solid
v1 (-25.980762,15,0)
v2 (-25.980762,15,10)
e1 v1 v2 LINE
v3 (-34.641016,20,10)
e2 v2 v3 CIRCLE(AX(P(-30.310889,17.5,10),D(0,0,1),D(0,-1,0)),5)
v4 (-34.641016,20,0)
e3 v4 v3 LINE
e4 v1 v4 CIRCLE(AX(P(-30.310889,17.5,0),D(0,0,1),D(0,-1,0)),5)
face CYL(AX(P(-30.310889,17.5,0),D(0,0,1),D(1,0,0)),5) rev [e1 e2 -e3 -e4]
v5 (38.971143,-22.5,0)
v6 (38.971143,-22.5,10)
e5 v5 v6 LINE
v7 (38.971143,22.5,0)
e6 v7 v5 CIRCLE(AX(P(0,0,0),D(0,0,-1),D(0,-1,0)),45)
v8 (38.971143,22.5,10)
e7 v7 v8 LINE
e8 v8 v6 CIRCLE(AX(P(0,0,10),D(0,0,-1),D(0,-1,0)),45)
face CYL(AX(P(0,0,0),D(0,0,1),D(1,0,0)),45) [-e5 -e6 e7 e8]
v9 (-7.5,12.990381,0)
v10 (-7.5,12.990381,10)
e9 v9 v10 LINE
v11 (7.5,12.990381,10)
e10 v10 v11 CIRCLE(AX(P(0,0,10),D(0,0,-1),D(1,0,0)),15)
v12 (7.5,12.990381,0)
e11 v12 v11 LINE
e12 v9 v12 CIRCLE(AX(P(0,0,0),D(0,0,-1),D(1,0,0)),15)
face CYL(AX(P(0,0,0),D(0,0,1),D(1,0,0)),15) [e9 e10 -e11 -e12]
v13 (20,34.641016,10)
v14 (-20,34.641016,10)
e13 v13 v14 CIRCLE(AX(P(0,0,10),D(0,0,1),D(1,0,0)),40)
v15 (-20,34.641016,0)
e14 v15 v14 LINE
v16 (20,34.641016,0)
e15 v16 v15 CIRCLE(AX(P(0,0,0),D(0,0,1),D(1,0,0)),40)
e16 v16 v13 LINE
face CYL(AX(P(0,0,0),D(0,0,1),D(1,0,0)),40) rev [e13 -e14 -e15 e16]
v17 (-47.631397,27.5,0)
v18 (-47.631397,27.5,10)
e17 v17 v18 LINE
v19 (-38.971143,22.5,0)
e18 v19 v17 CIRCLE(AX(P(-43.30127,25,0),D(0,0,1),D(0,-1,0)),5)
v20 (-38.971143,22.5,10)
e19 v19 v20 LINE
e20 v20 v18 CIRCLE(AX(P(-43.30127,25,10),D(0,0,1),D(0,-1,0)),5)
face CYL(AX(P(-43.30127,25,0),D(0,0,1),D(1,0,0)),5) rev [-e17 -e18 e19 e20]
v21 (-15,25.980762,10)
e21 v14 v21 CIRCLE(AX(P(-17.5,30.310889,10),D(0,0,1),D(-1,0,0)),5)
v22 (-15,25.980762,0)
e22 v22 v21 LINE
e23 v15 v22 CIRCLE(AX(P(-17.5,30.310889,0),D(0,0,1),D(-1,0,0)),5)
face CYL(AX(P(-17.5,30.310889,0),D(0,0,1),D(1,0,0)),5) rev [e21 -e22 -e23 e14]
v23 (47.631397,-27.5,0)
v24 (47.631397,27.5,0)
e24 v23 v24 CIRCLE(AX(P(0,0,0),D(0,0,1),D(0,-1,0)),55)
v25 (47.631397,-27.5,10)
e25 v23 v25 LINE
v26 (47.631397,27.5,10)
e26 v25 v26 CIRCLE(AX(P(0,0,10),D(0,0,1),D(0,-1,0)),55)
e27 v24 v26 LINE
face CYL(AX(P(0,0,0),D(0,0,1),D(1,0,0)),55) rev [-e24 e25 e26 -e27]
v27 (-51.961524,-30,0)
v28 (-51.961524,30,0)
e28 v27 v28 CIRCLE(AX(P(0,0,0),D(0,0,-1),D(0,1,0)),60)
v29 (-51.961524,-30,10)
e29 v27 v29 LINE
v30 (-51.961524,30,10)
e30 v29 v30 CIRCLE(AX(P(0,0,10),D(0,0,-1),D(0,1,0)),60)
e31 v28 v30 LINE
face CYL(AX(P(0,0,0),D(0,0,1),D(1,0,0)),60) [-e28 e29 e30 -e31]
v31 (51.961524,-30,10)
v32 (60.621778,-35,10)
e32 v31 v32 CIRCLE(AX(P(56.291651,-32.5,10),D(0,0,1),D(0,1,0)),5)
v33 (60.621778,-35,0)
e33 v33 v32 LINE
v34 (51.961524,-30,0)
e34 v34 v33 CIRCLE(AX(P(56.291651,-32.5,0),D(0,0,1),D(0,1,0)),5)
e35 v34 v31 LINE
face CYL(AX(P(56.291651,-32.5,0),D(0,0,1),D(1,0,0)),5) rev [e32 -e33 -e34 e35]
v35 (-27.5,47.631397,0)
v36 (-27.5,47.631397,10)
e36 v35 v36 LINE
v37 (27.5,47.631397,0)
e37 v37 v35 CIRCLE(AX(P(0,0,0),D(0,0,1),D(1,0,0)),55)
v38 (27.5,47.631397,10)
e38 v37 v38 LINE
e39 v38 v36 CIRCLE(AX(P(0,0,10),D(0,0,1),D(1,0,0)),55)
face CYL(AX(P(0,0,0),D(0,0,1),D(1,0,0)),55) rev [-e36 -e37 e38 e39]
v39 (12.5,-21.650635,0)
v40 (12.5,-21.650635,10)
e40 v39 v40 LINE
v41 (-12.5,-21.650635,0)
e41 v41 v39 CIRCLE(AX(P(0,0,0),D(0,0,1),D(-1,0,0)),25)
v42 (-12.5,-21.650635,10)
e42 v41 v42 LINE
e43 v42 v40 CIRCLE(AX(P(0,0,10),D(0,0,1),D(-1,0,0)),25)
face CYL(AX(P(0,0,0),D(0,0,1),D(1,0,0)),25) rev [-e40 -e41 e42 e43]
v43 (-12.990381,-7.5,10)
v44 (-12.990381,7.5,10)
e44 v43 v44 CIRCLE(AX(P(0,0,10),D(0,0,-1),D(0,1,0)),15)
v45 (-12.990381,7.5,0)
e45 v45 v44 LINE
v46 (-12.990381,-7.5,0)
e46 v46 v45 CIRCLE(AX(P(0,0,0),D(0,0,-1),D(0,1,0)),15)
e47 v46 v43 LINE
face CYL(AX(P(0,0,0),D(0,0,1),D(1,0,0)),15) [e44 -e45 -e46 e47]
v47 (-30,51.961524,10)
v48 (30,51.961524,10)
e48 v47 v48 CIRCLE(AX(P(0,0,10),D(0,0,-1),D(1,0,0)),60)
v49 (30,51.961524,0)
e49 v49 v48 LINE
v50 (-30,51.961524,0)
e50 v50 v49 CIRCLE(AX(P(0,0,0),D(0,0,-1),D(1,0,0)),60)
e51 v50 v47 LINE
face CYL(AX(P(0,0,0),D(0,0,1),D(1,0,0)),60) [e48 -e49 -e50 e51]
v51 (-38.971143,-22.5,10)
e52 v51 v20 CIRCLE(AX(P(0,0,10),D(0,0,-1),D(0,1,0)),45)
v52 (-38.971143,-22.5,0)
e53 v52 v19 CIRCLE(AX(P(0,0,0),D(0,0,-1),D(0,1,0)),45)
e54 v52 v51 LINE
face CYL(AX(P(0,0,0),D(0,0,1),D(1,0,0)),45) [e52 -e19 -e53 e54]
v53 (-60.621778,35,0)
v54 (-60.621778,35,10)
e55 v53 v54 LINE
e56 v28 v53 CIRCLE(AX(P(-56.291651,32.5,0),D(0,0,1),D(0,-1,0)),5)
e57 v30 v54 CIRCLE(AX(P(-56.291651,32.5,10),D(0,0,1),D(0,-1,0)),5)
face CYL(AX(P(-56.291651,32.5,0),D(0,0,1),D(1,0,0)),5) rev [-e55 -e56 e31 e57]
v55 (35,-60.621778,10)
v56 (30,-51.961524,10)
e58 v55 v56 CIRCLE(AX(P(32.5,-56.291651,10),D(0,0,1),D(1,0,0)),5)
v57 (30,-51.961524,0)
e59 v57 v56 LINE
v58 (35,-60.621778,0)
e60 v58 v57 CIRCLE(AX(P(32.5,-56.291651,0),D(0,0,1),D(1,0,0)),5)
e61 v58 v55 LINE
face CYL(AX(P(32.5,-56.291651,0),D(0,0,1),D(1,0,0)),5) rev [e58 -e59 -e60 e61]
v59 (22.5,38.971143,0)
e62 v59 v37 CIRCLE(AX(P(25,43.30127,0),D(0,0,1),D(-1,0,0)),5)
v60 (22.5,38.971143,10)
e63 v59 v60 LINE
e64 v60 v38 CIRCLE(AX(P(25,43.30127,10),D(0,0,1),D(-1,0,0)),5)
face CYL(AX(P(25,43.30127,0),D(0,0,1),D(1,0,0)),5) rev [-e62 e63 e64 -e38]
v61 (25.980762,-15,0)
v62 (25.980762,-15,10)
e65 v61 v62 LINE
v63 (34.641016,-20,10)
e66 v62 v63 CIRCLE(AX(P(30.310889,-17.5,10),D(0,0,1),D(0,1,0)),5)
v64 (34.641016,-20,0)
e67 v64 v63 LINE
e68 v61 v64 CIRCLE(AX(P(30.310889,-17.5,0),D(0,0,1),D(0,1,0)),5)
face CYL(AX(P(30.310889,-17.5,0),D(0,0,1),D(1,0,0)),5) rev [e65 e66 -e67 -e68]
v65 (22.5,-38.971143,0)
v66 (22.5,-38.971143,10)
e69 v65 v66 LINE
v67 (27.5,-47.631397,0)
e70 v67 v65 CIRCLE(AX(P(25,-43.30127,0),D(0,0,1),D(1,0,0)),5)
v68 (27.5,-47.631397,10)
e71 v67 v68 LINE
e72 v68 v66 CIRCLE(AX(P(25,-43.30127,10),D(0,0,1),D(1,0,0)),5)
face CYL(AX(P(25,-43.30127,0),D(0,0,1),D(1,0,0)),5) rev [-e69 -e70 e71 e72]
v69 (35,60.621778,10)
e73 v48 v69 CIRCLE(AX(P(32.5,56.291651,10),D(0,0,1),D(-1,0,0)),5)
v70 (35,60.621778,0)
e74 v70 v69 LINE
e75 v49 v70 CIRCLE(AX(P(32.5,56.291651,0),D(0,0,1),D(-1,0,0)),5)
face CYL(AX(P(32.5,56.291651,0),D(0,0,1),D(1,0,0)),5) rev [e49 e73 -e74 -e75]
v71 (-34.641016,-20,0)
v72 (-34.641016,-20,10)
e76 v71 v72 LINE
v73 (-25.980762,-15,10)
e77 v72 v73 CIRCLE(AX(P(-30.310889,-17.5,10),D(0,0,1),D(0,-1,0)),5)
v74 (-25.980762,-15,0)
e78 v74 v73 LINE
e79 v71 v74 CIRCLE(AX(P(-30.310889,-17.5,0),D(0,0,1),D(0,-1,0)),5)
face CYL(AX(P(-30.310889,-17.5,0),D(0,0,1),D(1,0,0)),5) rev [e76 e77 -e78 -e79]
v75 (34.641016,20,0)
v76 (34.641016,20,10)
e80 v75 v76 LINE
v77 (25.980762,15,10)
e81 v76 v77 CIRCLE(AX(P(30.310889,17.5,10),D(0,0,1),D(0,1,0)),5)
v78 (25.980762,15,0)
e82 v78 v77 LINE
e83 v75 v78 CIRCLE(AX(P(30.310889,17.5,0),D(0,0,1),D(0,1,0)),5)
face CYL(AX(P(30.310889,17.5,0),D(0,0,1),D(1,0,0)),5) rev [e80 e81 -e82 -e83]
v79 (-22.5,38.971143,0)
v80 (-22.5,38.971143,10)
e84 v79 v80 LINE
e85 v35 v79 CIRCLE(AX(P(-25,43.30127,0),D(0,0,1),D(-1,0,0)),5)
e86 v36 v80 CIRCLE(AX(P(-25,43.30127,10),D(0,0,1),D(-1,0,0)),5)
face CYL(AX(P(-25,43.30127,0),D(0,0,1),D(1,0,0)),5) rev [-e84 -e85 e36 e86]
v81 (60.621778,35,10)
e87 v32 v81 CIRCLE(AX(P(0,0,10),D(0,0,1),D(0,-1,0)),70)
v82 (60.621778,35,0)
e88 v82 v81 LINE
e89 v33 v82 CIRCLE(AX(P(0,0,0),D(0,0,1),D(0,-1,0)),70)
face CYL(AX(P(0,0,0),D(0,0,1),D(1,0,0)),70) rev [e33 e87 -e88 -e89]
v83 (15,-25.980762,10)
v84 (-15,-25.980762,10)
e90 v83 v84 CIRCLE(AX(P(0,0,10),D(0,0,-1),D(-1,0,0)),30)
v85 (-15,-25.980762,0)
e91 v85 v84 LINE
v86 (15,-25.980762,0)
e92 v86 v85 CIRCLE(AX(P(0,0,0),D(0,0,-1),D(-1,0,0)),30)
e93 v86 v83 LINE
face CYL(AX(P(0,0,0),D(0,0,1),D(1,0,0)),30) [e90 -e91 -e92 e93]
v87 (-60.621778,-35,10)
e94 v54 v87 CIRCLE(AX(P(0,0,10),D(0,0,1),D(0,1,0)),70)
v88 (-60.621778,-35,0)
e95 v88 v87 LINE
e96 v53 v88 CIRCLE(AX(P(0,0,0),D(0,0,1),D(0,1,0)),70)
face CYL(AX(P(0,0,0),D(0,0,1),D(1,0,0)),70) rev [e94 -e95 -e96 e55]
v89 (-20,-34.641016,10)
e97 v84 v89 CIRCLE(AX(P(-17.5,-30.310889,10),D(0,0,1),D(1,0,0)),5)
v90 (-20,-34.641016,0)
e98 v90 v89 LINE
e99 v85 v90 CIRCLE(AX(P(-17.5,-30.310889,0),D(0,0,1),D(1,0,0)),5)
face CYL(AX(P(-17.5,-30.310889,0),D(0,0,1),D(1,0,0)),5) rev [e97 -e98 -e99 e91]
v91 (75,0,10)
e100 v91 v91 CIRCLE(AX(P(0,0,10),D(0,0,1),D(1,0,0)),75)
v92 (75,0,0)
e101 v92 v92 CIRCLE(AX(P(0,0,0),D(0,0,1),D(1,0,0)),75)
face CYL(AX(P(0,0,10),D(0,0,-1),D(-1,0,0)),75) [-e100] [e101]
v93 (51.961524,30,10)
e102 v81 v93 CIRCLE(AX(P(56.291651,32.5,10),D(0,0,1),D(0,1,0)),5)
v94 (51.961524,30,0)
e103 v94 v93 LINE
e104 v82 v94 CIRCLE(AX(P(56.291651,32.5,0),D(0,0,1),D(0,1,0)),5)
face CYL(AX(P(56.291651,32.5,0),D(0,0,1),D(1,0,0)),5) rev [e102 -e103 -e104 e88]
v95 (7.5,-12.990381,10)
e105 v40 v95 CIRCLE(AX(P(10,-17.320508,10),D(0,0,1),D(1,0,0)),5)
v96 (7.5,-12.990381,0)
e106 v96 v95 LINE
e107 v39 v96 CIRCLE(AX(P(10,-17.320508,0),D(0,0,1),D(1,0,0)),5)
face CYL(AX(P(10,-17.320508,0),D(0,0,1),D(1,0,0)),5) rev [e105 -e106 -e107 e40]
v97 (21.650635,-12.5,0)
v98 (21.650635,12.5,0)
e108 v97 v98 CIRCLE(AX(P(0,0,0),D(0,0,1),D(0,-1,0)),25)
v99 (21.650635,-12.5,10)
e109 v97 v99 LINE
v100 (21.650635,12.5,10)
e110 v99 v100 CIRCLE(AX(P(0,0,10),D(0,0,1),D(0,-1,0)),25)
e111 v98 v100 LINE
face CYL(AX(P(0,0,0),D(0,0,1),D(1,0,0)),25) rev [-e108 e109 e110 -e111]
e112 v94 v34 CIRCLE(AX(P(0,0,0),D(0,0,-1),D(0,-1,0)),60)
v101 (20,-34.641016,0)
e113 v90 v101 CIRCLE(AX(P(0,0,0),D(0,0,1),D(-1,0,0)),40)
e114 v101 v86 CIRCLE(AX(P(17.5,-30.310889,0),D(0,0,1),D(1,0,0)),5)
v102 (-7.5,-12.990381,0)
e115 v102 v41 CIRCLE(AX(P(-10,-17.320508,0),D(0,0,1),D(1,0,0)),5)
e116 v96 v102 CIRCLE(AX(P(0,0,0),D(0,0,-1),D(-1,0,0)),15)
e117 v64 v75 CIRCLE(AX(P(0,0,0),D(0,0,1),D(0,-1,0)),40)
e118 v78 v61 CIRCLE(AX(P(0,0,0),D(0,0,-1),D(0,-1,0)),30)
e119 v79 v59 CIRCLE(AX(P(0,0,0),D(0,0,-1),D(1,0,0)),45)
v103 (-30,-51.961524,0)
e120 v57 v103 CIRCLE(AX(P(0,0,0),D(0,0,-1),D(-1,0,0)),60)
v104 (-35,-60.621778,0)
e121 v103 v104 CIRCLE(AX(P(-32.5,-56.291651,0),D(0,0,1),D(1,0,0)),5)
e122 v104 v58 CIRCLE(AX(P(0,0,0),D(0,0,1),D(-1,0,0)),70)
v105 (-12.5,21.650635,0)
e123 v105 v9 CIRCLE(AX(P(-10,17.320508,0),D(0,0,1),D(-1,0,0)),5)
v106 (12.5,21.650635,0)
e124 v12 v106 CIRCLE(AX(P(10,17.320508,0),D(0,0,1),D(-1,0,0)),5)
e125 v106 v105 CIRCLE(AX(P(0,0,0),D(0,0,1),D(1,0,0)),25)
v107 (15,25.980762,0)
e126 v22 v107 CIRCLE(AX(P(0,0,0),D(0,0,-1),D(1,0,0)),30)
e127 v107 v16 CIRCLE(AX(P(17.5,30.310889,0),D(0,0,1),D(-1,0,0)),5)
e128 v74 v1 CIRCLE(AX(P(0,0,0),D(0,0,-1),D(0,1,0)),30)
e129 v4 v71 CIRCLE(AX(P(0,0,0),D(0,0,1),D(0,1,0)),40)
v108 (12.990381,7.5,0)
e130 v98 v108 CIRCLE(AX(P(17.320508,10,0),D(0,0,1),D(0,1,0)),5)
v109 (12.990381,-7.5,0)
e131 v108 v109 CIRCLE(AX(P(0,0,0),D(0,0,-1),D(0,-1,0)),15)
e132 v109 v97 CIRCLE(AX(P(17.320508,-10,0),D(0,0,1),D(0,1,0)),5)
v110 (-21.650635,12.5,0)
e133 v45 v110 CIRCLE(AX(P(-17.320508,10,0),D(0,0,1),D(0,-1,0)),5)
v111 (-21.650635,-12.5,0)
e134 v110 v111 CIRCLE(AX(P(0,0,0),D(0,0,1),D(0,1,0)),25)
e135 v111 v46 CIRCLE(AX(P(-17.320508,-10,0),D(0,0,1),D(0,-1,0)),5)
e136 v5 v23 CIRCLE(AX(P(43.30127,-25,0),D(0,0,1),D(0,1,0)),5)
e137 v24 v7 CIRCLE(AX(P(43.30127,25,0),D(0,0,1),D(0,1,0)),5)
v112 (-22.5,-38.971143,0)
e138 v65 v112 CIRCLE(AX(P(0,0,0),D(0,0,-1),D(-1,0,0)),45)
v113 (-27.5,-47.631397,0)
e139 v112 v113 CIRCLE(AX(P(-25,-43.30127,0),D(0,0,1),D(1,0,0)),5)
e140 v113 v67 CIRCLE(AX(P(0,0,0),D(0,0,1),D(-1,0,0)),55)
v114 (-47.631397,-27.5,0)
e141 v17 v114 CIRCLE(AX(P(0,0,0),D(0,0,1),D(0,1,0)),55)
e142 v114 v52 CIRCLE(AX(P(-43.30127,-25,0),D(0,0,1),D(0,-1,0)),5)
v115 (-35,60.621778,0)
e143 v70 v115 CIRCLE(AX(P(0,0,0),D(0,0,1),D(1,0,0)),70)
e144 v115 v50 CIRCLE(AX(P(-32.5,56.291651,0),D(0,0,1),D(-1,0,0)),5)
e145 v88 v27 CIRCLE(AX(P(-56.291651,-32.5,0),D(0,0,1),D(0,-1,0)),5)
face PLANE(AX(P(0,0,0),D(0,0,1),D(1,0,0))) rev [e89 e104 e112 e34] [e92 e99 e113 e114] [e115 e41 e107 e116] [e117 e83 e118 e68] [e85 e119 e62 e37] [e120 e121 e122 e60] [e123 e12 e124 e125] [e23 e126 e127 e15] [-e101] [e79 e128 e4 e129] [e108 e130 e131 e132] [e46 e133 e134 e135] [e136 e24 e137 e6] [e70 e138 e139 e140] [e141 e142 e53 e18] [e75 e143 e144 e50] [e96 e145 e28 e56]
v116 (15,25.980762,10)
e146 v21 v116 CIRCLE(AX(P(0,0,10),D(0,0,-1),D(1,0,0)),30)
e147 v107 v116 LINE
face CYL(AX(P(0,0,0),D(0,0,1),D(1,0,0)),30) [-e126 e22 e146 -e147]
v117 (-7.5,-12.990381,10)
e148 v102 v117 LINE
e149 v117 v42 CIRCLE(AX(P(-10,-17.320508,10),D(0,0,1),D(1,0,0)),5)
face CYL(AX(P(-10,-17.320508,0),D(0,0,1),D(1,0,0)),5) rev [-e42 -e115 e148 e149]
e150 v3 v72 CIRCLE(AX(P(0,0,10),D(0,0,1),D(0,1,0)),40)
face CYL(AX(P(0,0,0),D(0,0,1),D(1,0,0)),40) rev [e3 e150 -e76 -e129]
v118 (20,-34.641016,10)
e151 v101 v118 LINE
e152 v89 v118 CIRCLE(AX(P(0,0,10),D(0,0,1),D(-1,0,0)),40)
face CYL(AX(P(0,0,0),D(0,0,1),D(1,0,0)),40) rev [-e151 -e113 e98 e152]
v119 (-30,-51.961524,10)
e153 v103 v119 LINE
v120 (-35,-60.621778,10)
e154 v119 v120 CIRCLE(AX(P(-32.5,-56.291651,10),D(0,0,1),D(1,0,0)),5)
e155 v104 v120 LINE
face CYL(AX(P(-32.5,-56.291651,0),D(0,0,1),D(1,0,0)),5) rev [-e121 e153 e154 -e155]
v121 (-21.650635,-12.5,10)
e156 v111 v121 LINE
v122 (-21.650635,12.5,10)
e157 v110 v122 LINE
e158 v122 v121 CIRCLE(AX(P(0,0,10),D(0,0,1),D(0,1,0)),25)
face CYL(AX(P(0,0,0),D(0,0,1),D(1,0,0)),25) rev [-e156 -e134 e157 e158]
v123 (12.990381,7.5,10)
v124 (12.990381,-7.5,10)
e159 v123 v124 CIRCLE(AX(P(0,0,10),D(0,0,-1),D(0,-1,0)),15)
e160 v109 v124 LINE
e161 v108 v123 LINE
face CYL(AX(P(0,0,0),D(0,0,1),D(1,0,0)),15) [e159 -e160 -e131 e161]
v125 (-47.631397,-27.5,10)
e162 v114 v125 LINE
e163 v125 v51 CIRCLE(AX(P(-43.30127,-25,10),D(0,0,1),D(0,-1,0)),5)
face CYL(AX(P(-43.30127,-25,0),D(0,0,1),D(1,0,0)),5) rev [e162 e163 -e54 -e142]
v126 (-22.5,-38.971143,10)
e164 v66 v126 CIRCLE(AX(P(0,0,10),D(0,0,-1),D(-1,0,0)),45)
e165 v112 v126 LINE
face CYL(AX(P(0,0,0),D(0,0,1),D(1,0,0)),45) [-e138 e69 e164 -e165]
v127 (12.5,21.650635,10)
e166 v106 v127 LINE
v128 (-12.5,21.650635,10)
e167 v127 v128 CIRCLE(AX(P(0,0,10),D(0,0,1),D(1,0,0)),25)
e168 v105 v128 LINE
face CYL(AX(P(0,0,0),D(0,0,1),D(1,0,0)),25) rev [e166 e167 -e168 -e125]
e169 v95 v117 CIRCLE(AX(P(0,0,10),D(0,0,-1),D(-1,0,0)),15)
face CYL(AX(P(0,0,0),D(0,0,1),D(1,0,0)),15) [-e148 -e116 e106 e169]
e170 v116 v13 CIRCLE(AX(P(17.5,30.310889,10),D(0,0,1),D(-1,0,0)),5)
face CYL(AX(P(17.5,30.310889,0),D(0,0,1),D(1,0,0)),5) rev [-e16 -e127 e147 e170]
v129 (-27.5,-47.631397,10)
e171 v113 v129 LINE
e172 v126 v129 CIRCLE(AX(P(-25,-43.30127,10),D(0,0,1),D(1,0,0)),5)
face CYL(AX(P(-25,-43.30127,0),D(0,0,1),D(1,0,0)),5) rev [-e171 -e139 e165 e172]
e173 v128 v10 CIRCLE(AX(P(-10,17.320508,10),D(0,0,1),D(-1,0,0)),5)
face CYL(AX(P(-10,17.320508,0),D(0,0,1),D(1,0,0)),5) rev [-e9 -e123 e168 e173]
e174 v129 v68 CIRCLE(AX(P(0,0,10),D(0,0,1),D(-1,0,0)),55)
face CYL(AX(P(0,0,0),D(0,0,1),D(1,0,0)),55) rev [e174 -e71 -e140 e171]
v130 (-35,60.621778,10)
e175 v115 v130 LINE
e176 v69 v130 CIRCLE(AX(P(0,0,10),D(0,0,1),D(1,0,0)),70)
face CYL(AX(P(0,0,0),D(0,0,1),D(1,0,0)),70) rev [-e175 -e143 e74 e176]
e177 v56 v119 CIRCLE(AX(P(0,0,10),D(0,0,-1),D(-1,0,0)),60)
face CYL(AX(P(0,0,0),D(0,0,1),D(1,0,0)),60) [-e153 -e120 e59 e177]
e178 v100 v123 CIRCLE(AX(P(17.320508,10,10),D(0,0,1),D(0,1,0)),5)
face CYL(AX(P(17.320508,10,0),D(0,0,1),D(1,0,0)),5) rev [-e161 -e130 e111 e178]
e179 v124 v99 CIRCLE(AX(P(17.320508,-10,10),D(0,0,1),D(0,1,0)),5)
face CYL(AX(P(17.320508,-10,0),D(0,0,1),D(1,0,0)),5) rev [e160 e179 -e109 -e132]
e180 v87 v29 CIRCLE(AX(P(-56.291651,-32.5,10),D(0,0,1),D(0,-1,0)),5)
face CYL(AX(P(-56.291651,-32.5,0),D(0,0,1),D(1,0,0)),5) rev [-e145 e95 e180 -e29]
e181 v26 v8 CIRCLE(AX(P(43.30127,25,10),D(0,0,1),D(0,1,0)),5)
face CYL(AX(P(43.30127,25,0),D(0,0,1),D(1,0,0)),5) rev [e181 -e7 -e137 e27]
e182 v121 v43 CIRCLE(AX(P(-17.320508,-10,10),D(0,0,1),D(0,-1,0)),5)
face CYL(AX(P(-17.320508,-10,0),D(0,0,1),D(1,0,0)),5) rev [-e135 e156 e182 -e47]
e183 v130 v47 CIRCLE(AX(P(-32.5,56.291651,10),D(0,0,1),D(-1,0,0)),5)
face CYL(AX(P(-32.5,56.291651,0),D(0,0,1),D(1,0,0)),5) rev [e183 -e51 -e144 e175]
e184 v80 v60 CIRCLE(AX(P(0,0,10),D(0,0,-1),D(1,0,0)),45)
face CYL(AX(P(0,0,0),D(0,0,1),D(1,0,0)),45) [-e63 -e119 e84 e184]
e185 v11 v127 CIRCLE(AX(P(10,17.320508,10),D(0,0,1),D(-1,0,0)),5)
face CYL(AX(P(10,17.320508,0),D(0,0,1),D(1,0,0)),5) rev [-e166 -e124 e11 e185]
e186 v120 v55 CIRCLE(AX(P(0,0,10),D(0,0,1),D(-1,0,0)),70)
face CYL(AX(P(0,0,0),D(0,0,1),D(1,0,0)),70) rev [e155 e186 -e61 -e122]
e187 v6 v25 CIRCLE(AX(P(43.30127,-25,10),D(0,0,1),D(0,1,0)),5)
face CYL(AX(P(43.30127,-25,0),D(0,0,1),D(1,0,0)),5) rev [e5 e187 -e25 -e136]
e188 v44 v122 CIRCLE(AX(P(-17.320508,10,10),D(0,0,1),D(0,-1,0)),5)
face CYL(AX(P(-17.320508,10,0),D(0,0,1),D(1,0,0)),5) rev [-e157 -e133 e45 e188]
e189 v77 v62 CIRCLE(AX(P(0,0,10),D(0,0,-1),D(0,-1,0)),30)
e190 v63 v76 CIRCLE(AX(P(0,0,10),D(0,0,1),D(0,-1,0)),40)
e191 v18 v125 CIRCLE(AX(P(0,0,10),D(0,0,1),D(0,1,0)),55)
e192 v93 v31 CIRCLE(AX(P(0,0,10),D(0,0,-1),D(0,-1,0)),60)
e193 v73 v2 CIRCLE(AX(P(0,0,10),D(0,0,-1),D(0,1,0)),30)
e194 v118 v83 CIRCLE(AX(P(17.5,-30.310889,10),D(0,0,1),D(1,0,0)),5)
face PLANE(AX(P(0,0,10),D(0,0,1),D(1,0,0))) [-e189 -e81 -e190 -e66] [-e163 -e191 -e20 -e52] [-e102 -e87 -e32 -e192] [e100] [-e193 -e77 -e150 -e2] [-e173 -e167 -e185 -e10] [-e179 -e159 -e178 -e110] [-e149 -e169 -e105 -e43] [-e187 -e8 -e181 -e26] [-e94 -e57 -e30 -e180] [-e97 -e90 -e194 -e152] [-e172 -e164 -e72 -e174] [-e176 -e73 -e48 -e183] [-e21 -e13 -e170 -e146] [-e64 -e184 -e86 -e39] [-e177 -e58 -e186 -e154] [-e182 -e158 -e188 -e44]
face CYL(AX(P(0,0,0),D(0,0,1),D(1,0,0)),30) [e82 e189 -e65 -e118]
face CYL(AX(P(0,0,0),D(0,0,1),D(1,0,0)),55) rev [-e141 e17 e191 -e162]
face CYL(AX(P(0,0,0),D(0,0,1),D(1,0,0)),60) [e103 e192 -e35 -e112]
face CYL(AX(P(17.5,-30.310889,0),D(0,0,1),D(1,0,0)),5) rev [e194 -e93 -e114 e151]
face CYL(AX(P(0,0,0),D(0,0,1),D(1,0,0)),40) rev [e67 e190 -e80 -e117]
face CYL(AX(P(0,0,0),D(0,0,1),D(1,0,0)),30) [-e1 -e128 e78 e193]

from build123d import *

# Parameters (mm, degrees)
SKETCH1_R           = 75
BOSS_EXTRUDE1_DEPTH = 10
CUT_EXTRUDE1_DEPTH  = 10
LPATTERN1_DEPTH     = 10
CIRPATTERN1_COUNT   = 4


# Read off the part's stored shape, not the designer's step: LPattern1
with BuildPart() as part:
    # Sketch1 → Boss-Extrude1 (new body)
    with BuildSketch(Plane.XY):
        Circle(SKETCH1_R)
    extrude(amount=BOSS_EXTRUDE1_DEPTH)

    # Sketch2 → Cut-Extrude1 (cut)
    with BuildSketch(Plane.XY.offset(10)):
        with BuildLine():
            ThreePointArc((35, 60.621778265), (0, 70), (-35, 60.621778265))
            ThreePointArc((-35, 60.621778265), (-36.830127019, 53.791651246), (-30, 51.961524227))
            ThreePointArc((-30, 51.961524227), (0, 60), (30, 51.961524227))
            ThreePointArc((30, 51.961524227), (36.830127019, 53.791651246), (35, 60.621778265))
        make_face()
    cut_extrude1 = extrude(amount=-CUT_EXTRUDE1_DEPTH, mode=Mode.SUBTRACT)

    # LPattern1 outline → LPattern1 (cut)
    with BuildSketch(Plane.XY):
        with BuildLine():
            ThreePointArc((-22.5, 38.97114317), (0, 45), (22.5, 38.97114317))
            ThreePointArc((22.5, 38.97114317), (29.330127019, 40.801270189), (27.5, 47.631397208))
            ThreePointArc((27.5, 47.631397208), (0, 55), (-27.5, 47.631397208))
            ThreePointArc((-27.5, 47.631397208), (-29.330127019, 40.801270189), (-22.5, 38.97114317))
        make_face()
        with BuildLine():
            ThreePointArc((-7.5, 12.990381057), (0, 15), (7.5, 12.990381057))
            ThreePointArc((7.5, 12.990381057), (14.330127019, 14.820508076), (12.5, 21.650635095))
            ThreePointArc((12.5, 21.650635095), (0, 25), (-12.5, 21.650635095))
            ThreePointArc((-12.5, 21.650635095), (-14.330127019, 14.820508076), (-7.5, 12.990381057))
        make_face()
        with BuildLine():
            ThreePointArc((-15, 25.980762114), (0, 30), (15, 25.980762114))
            ThreePointArc((15, 25.980762114), (21.830127019, 27.810889132), (20, 34.641016151))
            ThreePointArc((20, 34.641016151), (0, 40), (-20, 34.641016151))
            ThreePointArc((-20, 34.641016151), (-21.830127019, 27.810889132), (-15, 25.980762114))
        make_face()
    lpattern1 = extrude(amount=LPATTERN1_DEPTH, mode=Mode.SUBTRACT)

    # CirPattern1: Cut-Extrude1, LPattern1 ×4 about axis
    cirpattern1_axis = Axis((0, 0, 0), (0, 0, 1))
    add([cut_extrude1.rotate(cirpattern1_axis, i * 360 / CIRPATTERN1_COUNT) for i in range(1, CIRPATTERN1_COUNT)], mode=Mode.SUBTRACT)
    add([lpattern1.rotate(cirpattern1_axis, i * 360 / CIRPATTERN1_COUNT) for i in range(1, CIRPATTERN1_COUNT)], mode=Mode.SUBTRACT)


solid = part.part
